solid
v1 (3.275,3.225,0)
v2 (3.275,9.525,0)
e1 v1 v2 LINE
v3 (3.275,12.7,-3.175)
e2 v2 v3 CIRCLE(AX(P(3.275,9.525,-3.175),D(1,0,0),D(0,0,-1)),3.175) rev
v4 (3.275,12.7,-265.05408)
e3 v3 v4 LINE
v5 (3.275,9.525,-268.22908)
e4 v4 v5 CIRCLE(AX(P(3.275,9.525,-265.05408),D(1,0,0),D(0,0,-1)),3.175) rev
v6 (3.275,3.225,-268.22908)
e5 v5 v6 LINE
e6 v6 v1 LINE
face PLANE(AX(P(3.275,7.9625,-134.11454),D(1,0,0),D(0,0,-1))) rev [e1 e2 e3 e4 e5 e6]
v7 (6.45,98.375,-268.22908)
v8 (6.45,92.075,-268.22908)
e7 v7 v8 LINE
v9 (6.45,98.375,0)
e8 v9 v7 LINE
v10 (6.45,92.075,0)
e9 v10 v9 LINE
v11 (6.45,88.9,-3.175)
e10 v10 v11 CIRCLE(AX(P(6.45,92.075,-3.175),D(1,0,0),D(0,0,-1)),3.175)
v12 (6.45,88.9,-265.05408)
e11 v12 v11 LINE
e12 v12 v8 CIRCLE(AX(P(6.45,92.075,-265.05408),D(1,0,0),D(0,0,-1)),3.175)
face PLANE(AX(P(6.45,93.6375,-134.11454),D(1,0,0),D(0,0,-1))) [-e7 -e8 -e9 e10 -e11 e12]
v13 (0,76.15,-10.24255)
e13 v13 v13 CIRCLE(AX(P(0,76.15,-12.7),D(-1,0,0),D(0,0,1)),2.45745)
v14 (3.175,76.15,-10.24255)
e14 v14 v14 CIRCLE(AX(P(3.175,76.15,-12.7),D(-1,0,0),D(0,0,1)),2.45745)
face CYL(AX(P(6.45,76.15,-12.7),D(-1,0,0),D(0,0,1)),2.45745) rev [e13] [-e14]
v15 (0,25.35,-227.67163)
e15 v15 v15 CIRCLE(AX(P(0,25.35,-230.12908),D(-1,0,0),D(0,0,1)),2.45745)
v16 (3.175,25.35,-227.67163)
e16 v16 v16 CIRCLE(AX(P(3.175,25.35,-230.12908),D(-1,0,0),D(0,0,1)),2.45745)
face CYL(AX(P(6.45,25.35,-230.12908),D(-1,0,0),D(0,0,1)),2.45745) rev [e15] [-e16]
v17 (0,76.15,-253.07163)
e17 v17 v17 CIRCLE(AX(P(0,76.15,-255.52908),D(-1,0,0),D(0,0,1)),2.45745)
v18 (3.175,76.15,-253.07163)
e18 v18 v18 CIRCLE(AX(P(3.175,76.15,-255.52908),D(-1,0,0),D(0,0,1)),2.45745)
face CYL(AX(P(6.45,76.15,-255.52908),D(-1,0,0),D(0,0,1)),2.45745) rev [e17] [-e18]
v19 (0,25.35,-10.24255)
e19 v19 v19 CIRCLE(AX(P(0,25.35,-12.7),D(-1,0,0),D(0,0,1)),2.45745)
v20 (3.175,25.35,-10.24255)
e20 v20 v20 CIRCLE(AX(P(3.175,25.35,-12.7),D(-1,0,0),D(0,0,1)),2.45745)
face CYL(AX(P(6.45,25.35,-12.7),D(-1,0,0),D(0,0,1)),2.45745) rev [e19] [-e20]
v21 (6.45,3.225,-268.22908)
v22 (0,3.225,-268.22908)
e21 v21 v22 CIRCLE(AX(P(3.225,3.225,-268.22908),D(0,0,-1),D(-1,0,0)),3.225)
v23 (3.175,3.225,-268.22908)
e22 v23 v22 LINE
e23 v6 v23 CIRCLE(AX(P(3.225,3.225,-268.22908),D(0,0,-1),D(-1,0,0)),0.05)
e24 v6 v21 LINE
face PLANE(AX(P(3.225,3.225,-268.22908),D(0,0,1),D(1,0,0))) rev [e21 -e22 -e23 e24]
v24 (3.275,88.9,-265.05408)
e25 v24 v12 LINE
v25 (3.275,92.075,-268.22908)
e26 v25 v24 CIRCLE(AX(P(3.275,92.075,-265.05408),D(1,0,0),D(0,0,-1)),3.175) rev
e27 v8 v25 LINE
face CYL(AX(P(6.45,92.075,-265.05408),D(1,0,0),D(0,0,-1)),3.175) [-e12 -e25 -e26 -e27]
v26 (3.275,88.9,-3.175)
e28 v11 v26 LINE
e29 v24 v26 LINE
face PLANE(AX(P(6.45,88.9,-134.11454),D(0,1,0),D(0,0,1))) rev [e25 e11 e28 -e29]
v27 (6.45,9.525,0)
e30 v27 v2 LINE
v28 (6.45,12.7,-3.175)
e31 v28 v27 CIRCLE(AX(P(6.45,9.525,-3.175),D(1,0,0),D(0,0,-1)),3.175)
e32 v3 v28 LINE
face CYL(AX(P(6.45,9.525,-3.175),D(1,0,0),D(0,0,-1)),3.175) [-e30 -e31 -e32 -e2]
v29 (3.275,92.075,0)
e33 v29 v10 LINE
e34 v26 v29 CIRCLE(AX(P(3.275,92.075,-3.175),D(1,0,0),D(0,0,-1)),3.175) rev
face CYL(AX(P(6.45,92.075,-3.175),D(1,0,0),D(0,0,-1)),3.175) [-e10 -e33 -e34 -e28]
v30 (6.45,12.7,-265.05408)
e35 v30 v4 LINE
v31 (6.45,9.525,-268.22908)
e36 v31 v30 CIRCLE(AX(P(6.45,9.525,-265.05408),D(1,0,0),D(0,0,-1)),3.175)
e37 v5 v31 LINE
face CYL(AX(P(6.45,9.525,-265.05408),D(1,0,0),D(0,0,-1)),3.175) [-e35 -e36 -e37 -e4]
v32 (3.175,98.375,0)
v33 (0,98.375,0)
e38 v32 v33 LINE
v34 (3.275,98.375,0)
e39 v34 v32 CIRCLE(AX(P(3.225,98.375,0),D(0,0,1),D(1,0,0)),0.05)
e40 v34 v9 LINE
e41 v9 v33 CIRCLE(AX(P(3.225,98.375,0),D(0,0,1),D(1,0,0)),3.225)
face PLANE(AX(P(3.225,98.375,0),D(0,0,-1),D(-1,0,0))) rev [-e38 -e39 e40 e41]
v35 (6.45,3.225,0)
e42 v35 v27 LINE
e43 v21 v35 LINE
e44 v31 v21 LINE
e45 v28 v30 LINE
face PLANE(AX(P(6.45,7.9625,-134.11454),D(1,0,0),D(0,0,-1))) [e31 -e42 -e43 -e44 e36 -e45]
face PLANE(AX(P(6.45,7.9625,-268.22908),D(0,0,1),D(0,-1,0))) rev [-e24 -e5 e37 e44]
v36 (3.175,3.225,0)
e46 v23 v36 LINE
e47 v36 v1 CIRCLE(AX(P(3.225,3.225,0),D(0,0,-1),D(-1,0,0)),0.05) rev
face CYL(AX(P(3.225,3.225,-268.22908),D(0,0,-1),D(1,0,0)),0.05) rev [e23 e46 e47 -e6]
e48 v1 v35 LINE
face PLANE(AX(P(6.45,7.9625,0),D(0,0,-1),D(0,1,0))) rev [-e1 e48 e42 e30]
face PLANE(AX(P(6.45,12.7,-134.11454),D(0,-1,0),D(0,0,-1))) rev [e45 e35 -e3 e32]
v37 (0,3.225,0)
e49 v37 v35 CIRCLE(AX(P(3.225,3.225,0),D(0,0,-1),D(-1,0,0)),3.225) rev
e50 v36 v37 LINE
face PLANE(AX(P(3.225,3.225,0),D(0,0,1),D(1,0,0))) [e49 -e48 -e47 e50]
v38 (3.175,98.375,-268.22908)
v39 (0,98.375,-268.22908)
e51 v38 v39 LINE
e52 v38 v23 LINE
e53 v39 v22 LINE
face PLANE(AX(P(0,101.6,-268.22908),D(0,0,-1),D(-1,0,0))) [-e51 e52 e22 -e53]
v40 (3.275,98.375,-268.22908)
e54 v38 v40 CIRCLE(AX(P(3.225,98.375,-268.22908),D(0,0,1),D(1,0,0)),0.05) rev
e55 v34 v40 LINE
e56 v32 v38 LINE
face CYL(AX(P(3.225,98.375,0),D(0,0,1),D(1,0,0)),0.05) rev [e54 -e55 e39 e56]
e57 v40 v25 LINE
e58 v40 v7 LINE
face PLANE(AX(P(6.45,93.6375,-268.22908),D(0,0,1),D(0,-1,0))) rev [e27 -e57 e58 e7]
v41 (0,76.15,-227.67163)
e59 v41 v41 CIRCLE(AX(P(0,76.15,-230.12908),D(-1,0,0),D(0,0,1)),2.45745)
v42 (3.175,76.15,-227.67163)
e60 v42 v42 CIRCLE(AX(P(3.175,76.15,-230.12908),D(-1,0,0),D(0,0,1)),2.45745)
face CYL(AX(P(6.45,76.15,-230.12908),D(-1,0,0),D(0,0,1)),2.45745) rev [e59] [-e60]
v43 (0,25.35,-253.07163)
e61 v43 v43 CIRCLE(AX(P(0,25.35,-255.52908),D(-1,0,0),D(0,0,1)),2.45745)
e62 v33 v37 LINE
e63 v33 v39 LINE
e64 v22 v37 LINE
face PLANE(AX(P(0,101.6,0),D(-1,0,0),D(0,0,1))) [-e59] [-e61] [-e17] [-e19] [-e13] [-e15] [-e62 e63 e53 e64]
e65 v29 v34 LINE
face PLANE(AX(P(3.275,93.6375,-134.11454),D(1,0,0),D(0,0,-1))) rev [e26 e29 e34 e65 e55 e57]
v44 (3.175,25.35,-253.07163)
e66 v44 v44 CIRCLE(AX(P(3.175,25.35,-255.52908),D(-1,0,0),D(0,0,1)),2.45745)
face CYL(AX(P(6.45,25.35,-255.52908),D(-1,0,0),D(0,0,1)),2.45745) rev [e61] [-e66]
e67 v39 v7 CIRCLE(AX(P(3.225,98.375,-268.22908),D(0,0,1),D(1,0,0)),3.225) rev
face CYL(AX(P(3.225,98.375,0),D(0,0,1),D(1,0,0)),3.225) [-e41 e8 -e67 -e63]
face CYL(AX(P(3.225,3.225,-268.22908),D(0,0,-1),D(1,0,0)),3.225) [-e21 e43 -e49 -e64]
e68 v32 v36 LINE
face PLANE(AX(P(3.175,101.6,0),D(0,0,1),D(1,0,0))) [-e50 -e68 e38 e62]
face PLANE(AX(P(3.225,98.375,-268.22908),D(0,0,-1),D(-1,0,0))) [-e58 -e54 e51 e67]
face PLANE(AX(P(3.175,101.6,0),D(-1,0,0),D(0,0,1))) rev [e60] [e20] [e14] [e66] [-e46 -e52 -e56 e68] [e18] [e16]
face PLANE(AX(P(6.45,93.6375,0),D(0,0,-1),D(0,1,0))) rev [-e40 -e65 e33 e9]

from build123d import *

# Parameters (mm, degrees)
SKETCH1_W          = 3.175
SKETCH1_H          = 268.22908
BASE_FLANGE1_DEPTH = 101.6
HEM1_START         = -268.22908
HEM1_DEPTH         = 268.22908
HEM1_2_DEPTH       = 268.22908
SKETCH10_R         = 2.45745
CUT_EXTRUDE1_DEPTH = 287.898940147
FILLET1_R          = 3.175


# Read off the part's stored shape, not the designer's step: Hem1
# Sheet-metal steps are written as plain solids
with BuildPart() as part:
    # Sketch1 → Base-Flange1 (new body)
    with BuildSketch(Plane(origin=(0, 0, 0), x_dir=(1, 0, 0), z_dir=(0, 1, 0))):
        with Locations((1.5875, 134.11454)):
            Rectangle(SKETCH1_W, SKETCH1_H)
    extrude(amount=BASE_FLANGE1_DEPTH)

    # Hem1 outline → Hem1 (cut)
    with BuildSketch(Plane.XY.offset(HEM1_START)):
        with BuildLine():
            ThreePointArc((0, 98.375), (0.926970953, 100.637672645), (3.175, 101.59961238))
            Line((3.175, 101.59961238), (3.175, 101.6))
            Line((3.175, 101.6), (0, 101.6))
            Line((0, 101.6), (0, 98.375))
        make_face()
        with BuildLine():
            ThreePointArc((3.175, 0.00038762), (0.926970953, 0.962327355), (0, 3.225))
            Line((0, 3.225), (0, 0))
            Line((0, 0), (3.175, 0))
            Line((3.175, 0), (3.175, 0.00038762))
        make_face()
    extrude(amount=HEM1_DEPTH, mode=Mode.SUBTRACT)

    # Hem1 2 outline → Hem1 2 (add)
    with BuildSketch(Plane.XY.offset(HEM1_START)):
        with BuildLine():
            Line((3.275, 88.9), (6.45, 88.9))
            Line((6.45, 88.9), (6.45, 98.375))
            ThreePointArc((6.45, 98.375), (5.487672645, 100.673029047), (3.175, 101.59961238))
            Line((3.175, 101.59961238), (3.175, 98.375))
            ThreePointArc((3.175, 98.375), (3.225, 98.425), (3.275, 98.375))
            Line((3.275, 98.375), (3.275, 88.9))
        make_face()
        with BuildLine():
            ThreePointArc((3.275, 3.225), (3.225, 3.175), (3.175, 3.225))
            Line((3.175, 3.225), (3.175, 0.00038762))
            ThreePointArc((3.175, 0.00038762), (5.487672645, 0.926970953), (6.45, 3.225))
            Line((6.45, 3.225), (6.45, 12.7))
            Line((6.45, 12.7), (3.275, 12.7))
            Line((3.275, 12.7), (3.275, 3.225))
        make_face()
    extrude(amount=HEM1_2_DEPTH)

    # Sketch10 → Cut-Extrude1 (cut, through all)
    with BuildSketch(Plane.ZY):
        with Locations((-255.52908, 76.15)):
            Circle(SKETCH10_R)
        with Locations((-255.52908, 25.35)):
            Circle(SKETCH10_R)
        with Locations((-230.12908, 25.35)):
            Circle(SKETCH10_R)
        with Locations((-230.12908, 76.15)):
            Circle(SKETCH10_R)
        with Locations((-12.7, 76.15)):
            Circle(SKETCH10_R)
        with Locations((-12.7, 25.35)):
            Circle(SKETCH10_R)
    extrude(amount=-CUT_EXTRUDE1_DEPTH, mode=Mode.SUBTRACT)

    # Fillet1
    fillet1_edges = [part.edges().sort_by_distance(p)[0] for p in [
        (4.8625, 88.9, 0),
        (4.8625, 88.9, -268.22908),
        (4.8625, 12.7, -268.22908),
        (4.8625, 12.7, 0),
    ]]
    fillet(fillet1_edges, radius=FILLET1_R)


solid = part.part
